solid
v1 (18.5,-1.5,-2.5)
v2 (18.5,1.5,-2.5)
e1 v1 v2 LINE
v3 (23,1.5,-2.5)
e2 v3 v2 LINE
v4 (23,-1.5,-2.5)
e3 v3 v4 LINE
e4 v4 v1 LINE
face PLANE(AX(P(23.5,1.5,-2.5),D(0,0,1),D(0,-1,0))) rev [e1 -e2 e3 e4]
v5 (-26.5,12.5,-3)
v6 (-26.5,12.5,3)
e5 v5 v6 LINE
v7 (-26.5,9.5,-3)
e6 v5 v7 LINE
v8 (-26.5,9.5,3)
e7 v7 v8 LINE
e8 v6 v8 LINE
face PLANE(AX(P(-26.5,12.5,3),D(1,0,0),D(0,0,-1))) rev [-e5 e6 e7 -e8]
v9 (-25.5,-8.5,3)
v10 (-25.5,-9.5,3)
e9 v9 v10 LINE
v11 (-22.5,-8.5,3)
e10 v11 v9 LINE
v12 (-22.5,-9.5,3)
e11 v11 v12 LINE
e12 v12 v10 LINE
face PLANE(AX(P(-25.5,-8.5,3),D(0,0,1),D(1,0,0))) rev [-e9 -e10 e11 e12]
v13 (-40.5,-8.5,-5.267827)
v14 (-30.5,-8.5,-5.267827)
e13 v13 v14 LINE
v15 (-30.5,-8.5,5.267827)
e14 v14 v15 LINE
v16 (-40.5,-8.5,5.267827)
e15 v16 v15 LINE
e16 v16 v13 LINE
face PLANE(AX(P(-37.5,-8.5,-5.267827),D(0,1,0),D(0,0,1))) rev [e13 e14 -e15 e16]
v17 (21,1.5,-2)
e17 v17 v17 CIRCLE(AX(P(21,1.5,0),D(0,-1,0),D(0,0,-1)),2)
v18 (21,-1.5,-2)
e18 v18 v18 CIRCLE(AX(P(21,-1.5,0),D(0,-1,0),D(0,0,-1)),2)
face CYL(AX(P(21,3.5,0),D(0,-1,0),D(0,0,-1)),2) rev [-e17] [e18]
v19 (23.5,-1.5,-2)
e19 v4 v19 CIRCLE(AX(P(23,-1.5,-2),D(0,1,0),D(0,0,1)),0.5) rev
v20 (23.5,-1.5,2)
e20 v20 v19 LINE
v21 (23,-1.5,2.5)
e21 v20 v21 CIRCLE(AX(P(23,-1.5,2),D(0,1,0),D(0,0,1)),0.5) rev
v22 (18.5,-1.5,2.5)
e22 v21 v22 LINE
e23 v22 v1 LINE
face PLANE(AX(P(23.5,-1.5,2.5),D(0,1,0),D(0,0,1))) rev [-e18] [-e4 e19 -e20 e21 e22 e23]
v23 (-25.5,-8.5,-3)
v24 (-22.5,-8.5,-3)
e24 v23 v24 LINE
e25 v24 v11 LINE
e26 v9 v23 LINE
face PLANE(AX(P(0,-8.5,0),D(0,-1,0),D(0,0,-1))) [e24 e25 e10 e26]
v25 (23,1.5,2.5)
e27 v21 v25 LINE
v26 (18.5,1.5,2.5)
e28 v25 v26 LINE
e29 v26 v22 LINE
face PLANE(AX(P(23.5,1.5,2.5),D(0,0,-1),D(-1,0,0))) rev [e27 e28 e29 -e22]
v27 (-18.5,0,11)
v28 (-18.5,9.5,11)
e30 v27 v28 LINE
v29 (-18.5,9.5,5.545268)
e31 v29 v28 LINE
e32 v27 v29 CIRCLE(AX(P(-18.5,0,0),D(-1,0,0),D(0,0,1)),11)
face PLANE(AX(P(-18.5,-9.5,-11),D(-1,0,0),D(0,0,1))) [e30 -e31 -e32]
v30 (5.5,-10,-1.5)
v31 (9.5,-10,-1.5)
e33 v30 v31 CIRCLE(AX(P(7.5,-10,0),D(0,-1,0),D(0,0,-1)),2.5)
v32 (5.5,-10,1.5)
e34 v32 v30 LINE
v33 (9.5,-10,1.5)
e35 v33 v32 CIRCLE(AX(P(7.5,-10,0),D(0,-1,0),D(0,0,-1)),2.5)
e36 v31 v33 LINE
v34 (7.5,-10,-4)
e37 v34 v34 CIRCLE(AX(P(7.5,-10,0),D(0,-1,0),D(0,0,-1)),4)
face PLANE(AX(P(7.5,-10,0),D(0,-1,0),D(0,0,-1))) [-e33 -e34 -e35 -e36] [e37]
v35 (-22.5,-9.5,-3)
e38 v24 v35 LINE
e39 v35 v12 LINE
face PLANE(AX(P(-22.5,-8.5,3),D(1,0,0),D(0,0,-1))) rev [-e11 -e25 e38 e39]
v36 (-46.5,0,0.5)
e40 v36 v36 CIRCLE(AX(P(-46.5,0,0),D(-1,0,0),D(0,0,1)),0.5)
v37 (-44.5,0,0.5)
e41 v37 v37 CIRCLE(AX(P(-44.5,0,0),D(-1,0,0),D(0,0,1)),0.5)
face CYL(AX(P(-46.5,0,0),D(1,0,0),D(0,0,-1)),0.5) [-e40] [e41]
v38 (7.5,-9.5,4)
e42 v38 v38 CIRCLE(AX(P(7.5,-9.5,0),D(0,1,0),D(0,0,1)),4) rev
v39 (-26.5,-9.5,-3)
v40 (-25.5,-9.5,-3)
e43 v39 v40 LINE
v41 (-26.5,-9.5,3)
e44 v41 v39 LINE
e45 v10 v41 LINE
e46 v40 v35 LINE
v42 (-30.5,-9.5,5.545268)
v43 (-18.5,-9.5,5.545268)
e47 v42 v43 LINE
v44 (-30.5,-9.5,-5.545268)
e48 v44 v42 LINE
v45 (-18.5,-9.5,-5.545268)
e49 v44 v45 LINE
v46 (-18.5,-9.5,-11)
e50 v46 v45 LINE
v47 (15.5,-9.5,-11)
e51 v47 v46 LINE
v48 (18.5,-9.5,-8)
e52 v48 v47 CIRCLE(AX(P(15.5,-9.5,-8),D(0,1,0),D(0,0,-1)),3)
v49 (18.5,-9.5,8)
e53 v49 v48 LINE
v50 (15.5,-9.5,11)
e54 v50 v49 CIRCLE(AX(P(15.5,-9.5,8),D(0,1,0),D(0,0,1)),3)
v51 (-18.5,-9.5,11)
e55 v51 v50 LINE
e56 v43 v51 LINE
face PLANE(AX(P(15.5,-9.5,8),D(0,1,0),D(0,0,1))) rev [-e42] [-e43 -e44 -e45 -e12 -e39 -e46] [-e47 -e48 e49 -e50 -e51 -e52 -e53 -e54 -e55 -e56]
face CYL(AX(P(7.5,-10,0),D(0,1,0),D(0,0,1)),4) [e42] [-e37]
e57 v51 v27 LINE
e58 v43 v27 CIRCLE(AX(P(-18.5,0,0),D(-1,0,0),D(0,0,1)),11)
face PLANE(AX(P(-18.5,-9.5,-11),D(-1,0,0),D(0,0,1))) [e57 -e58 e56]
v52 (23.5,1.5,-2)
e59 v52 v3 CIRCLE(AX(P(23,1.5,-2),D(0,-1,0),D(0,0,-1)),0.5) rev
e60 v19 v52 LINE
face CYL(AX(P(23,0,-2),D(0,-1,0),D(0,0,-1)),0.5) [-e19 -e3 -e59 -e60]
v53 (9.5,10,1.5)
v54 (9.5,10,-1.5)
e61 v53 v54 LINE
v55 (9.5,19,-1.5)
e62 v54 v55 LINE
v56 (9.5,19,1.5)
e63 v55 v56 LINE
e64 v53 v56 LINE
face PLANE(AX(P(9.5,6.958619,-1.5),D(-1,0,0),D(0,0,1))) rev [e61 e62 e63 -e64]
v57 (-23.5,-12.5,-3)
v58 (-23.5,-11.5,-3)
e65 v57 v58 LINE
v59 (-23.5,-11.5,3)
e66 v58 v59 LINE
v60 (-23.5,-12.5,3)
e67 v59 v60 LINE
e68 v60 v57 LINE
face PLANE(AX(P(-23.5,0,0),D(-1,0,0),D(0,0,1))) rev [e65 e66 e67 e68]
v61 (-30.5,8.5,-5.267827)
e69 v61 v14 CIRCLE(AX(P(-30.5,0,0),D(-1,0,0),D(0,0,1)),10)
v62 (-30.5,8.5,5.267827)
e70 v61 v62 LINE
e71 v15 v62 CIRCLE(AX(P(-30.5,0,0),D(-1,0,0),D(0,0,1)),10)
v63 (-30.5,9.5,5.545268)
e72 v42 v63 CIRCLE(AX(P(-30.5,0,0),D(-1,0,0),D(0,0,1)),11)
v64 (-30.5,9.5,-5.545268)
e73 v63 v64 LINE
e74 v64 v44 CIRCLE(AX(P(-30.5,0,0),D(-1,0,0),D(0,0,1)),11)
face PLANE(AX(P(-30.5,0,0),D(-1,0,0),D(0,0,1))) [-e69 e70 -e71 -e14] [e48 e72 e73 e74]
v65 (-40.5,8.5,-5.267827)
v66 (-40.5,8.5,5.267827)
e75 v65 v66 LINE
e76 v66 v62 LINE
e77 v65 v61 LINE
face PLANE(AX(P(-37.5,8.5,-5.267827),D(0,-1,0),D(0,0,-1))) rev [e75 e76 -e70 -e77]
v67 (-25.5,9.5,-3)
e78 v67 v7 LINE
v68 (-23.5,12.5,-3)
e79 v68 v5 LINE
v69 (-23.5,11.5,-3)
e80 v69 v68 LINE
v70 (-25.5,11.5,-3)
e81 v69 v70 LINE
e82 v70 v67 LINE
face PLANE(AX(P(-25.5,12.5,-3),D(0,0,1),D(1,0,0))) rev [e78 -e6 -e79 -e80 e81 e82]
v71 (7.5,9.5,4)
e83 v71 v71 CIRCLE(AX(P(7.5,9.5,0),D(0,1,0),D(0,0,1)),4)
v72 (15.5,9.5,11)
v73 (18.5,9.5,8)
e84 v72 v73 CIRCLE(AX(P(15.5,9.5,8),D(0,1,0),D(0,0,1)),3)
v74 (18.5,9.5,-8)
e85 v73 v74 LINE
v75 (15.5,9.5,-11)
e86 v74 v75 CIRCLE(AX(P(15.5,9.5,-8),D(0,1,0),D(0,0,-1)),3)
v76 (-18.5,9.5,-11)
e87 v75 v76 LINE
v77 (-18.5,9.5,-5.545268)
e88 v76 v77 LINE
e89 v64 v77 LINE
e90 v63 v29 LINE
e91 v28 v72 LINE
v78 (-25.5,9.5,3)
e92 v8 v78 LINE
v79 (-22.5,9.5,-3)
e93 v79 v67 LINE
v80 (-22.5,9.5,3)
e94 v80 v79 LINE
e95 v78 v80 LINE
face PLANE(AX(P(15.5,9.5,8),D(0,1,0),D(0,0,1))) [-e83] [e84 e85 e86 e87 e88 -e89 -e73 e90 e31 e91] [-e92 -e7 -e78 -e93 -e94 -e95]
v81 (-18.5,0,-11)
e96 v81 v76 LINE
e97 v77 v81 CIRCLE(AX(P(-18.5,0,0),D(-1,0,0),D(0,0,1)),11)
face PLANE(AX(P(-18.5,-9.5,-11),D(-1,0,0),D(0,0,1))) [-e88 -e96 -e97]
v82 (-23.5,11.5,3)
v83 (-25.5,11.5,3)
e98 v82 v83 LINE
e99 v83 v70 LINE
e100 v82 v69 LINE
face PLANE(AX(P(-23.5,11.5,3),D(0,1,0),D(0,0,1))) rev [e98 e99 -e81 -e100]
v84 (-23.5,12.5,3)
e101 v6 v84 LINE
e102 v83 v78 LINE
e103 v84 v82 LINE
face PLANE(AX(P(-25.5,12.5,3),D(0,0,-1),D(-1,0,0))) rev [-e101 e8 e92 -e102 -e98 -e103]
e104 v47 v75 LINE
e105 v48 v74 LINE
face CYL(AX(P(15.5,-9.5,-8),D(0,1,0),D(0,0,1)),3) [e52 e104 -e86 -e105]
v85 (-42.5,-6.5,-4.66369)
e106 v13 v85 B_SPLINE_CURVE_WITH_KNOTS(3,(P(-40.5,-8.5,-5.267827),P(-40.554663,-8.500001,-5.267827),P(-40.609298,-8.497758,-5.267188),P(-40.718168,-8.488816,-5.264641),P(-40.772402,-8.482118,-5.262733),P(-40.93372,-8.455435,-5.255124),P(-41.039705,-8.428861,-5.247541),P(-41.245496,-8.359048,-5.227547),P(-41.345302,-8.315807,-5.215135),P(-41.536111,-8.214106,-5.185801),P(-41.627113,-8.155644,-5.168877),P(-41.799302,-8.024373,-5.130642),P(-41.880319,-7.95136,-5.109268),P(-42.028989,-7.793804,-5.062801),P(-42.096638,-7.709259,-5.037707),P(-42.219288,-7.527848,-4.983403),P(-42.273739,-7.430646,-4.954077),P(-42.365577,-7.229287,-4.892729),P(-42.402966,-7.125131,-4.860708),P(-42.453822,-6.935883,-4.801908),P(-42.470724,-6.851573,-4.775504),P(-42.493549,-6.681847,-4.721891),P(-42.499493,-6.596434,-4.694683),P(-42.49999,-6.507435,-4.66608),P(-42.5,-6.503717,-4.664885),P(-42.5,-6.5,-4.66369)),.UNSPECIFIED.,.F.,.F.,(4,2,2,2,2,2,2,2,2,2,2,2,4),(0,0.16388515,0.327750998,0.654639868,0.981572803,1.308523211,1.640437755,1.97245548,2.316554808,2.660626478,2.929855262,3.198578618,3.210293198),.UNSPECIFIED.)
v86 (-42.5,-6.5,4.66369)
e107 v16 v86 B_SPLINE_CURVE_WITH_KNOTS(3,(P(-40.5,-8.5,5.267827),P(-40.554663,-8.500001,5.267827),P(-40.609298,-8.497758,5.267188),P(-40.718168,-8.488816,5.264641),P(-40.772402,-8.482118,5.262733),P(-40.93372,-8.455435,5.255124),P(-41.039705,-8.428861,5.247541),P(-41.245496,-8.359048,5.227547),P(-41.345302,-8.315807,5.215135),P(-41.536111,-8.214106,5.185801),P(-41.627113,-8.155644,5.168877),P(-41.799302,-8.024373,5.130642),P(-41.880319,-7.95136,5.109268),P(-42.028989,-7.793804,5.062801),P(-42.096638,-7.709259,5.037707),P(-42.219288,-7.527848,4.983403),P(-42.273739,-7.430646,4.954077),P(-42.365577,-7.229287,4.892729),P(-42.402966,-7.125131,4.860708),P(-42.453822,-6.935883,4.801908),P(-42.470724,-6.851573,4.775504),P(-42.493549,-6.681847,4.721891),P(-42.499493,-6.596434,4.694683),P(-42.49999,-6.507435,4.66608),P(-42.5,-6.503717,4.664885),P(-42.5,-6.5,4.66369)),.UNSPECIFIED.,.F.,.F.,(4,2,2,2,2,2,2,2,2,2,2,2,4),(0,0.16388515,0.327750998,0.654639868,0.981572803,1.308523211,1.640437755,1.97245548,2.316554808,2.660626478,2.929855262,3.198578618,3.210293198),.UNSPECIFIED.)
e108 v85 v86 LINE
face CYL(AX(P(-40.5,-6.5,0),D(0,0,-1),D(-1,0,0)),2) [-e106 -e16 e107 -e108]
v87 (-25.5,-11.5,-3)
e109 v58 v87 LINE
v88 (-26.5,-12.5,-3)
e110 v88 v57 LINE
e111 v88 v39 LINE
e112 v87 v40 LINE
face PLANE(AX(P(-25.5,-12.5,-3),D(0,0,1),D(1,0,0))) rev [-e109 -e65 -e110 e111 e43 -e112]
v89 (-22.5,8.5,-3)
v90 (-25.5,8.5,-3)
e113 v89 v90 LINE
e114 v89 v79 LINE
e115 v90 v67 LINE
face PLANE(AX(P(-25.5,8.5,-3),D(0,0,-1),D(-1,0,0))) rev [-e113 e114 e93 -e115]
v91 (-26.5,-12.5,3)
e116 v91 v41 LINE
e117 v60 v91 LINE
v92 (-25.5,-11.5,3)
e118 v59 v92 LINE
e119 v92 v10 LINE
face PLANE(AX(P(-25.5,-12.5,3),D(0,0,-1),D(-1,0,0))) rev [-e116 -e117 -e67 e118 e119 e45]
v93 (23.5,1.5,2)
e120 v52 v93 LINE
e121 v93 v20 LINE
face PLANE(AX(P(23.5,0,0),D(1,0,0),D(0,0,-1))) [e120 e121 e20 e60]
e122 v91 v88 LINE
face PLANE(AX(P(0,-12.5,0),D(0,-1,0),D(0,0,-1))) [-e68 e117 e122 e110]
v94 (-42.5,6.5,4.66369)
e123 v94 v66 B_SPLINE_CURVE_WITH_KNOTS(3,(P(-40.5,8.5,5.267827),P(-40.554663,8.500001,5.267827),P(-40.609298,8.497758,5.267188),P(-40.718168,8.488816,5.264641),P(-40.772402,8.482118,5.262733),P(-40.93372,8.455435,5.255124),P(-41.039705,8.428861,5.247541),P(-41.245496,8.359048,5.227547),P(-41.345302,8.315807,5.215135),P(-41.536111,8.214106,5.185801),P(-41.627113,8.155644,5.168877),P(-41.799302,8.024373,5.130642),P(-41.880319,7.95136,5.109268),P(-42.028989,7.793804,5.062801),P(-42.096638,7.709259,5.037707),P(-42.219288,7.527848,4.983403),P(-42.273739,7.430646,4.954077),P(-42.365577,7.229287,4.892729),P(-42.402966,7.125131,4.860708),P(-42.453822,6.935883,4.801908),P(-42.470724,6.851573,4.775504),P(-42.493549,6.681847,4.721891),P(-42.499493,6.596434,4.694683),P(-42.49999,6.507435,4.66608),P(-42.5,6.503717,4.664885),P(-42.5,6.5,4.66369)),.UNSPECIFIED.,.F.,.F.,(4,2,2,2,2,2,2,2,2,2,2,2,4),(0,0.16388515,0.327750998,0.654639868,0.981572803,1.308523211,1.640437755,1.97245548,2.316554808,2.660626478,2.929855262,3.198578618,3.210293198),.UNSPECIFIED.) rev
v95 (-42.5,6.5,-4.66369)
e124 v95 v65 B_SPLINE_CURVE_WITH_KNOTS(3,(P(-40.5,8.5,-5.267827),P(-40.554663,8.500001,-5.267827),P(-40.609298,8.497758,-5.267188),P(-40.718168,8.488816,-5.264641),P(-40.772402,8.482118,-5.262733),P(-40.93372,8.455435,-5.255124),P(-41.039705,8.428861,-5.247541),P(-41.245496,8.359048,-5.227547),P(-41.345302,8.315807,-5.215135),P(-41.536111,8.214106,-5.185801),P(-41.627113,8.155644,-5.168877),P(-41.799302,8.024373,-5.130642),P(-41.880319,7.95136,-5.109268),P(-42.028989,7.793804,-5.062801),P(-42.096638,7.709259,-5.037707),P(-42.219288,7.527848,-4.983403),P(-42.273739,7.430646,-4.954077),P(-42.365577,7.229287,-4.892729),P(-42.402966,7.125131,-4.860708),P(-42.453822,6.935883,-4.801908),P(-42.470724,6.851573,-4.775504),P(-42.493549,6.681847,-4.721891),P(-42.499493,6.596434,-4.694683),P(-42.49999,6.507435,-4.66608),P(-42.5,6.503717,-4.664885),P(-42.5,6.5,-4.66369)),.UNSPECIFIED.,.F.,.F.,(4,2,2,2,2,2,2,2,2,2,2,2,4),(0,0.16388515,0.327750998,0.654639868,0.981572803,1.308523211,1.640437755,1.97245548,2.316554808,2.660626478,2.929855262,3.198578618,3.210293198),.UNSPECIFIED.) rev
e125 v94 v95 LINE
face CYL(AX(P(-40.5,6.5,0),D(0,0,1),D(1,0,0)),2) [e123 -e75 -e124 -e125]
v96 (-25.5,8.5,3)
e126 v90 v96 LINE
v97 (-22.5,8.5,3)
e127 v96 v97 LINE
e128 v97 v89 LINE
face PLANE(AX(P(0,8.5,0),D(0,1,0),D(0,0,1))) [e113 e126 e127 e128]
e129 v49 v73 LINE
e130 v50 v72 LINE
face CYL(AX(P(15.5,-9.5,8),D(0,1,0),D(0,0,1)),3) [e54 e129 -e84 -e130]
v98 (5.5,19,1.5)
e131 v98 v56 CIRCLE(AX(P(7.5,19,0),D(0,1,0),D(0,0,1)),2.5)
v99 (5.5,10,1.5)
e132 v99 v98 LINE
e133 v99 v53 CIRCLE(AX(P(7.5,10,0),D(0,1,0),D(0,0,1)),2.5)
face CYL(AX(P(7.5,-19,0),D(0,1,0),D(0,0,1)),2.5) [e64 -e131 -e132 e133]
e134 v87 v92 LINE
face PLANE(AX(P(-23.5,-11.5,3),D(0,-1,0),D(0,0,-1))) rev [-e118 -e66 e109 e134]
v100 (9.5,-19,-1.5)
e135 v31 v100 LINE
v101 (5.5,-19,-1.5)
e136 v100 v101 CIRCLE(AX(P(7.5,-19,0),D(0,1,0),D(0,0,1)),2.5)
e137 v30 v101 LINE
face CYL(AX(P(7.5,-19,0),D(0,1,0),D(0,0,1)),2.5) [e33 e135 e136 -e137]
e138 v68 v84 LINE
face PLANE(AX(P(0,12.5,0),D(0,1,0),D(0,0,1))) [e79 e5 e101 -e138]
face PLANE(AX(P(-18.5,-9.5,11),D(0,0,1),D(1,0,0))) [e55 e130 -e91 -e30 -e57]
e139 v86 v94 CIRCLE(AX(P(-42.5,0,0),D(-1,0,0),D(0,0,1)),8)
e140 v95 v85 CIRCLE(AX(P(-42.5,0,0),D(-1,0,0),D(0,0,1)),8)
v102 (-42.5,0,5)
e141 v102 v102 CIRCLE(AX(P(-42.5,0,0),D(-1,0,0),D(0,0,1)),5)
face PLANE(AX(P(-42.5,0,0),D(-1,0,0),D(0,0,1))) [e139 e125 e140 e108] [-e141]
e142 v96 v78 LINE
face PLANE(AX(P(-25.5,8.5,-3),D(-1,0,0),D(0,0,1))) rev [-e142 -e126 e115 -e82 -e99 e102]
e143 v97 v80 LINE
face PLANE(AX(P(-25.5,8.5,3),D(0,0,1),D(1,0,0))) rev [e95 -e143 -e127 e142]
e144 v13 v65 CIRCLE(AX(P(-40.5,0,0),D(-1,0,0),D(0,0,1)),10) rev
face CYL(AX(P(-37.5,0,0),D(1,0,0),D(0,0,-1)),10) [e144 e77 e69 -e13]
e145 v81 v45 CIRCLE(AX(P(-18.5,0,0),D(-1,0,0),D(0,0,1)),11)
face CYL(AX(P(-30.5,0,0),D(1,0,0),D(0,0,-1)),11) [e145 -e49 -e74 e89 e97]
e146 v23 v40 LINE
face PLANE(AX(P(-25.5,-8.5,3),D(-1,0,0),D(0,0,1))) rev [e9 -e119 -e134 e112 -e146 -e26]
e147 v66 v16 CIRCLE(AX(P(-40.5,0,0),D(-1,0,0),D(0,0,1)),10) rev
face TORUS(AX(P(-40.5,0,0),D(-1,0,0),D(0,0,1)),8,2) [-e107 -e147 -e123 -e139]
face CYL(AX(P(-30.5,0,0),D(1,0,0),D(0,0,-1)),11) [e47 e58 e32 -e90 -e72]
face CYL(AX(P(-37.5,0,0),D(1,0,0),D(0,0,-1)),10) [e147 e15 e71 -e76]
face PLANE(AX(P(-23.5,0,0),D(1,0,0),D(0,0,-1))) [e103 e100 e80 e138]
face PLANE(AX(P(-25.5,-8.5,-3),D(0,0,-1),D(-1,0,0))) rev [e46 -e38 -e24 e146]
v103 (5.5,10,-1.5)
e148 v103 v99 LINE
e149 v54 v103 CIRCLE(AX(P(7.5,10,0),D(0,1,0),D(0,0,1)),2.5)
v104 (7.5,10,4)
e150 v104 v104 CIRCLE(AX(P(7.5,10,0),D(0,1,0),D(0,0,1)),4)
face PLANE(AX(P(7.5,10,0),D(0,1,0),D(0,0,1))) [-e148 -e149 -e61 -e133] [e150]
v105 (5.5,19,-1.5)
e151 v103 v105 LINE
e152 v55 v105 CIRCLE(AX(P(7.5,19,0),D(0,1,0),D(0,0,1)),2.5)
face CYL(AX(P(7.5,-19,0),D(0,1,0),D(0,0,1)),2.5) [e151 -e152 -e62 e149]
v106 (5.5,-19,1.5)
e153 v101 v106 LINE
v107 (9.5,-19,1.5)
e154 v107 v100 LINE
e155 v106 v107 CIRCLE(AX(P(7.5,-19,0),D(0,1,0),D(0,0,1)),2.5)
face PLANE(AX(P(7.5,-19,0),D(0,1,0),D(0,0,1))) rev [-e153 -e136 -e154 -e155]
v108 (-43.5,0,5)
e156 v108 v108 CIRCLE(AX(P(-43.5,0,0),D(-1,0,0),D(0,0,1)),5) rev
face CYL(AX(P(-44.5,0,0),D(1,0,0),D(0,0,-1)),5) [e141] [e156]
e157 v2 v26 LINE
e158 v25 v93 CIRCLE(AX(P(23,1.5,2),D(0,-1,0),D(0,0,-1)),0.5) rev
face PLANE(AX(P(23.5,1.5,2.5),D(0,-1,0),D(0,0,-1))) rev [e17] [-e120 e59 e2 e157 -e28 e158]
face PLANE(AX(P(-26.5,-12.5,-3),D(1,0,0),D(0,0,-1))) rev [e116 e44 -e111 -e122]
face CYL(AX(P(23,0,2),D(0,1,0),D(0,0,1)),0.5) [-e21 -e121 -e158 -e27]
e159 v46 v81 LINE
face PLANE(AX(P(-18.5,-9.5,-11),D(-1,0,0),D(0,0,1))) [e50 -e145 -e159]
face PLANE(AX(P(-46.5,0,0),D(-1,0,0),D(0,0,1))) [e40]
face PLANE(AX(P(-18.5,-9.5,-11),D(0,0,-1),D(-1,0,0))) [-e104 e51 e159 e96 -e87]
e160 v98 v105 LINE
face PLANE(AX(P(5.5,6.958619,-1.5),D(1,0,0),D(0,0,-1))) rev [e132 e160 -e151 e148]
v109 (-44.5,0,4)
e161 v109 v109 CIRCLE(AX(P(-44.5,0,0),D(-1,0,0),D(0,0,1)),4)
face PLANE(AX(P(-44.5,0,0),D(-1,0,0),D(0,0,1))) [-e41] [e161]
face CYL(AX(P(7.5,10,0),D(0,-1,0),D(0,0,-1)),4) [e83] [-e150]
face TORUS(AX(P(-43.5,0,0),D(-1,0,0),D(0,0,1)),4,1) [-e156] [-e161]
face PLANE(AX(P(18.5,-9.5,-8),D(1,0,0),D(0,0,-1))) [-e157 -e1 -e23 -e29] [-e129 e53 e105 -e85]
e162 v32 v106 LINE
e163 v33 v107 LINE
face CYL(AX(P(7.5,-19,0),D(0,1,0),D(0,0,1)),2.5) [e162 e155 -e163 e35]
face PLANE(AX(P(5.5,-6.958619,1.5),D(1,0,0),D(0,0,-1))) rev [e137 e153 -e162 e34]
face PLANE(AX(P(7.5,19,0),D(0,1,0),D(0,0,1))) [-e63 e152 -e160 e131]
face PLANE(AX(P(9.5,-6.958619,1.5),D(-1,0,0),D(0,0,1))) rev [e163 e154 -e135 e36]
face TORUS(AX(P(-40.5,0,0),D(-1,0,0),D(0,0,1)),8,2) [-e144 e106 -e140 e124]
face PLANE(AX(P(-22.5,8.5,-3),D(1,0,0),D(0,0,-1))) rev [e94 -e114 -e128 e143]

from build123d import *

# Parameters (mm, degrees)
Y_KSEKLIK_EKSTR_ZYON1_DEPTH      = 9.5
Y_KSEKLIK_EKSTR_ZYON1_DEPTH_BACK = 9.5
IZIM7_R                          = 2.5
KES_EKSTR_ZYON2_DEPTH            = 19
Y_KSEKLIK_EKSTR_ZYON7_START      = 0.5
IZIM8_R                          = 4
IZIM8_R_2                        = 2.5
Y_KSEKLIK_EKSTR_ZYON7_DEPTH      = 0.5
IZIM9_R                          = 4
IZIM9_R_2                        = 2.5
Y_KSEKLIK_EKSTR_ZYON8_DEPTH      = 0.5
Y_KSEKLIK_EKSTR_ZYON9_DEPTH      = 19
Y_KSEKLIK_EKSTR_ZYON9_DEPTH_BACK = 19
IZIM10_R                         = 2.5
KES_EKSTR_ZYON4_DEPTH            = 9
KES_EKSTR_ZYON5_DEPTH            = 9
IZIM13_W                         = 5
IZIM13_H                         = 3
Y_KSEKLIK_EKSTR_ZYON10_DEPTH     = 5
IZIM14_R                         = 2
KES_EKSTR_ZYON6_DEPTH            = 5
RADYUS3_R                        = 0.5
Y_KSEKLIK_EKSTR_ZYON11_DEPTH     = 12
Y_KSEKLIK_EKSTR_ZYON12_DEPTH     = 19
Y_KSEKLIK_EKSTR_ZYON13_DEPTH     = 5
RADYUS4_R                        = 2
IZIM18_R                         = 5
Y_KSEKLIK_EKSTR_ZYON14_DEPTH     = 2
RADYUS5_R                        = 1
IZIM19_R                         = 0.5
Y_KSEKLIK_EKSTR_ZYON15_DEPTH     = 2
IZIM20_W                         = 3
IZIM20_H                         = 6
KES_EKSTR_ZYON7_DEPTH            = 1
IZIM21_W                         = 3
IZIM21_H                         = 6
KES_EKSTR_ZYON8_DEPTH            = 1
IZIM22_W                         = 1
IZIM22_H                         = 6
Y_KSEKLIK_EKSTR_ZYON17_DEPTH     = 3
IZIM23_W                         = 6
IZIM23_H                         = 1
Y_KSEKLIK_EKSTR_ZYON18_DEPTH     = 2
IZIM24_W                         = 1
IZIM24_H                         = 6
Y_KSEKLIK_EKSTR_ZYON19_DEPTH     = 3
IZIM25_W                         = 6
IZIM25_H                         = 1
Y_KSEKLIK_EKSTR_ZYON20_DEPTH     = 2


with BuildPart() as part:
    # Çizim1 → Yükseklik-Ekstrüzyon1 (new, two sides: drawn at the far end of the back side and taken through both)
    with BuildSketch(Plane(origin=(0, 0, 0), x_dir=(1, 0, 0), z_dir=(0, 1, 0)).offset(-Y_KSEKLIK_EKSTR_ZYON1_DEPTH_BACK)):
        with BuildLine():
            Line((-18.5, 11), (15.5, 11))
            ThreePointArc((15.5, 11), (17.621320344, 10.121320344), (18.5, 8))
            Line((18.5, 8), (18.5, -8))
            ThreePointArc((18.5, -8), (17.621320344, -10.121320344), (15.5, -11))
            Line((15.5, -11), (-18.5, -11))
            Line((-18.5, -11), (-18.5, 11))
        make_face()
    extrude(amount=Y_KSEKLIK_EKSTR_ZYON1_DEPTH + Y_KSEKLIK_EKSTR_ZYON1_DEPTH_BACK)

    # Çizim7 → Kes-Ekstrüzyon2 (cut)
    with BuildSketch(Plane(origin=(0, 9.5, 0), x_dir=(1, 0, 0), z_dir=(0, 1, 0))):
        with Locations(Location((7.5, 0, 0), (0, 0, 270))):
            Circle(IZIM7_R)
    extrude(amount=-KES_EKSTR_ZYON2_DEPTH, mode=Mode.SUBTRACT)

    # Çizim8 → Yükseklik-Ekstrüzyon7 (add)
    with BuildSketch(Plane(origin=(0, 9.5, 0), x_dir=(1, 0, 0), z_dir=(0, 1, 0)).offset(Y_KSEKLIK_EKSTR_ZYON7_START)):
        with Locations(Location((7.5, 0, 0), (0, 0, 270))):
            Circle(IZIM8_R)
        with Locations(Location((7.5, 0, 0), (0, 0, 270))):
            Circle(IZIM8_R_2, mode=Mode.SUBTRACT)
    extrude(amount=-Y_KSEKLIK_EKSTR_ZYON7_DEPTH)

    # Çizim9 → Yükseklik-Ekstrüzyon8 (add)
    with BuildSketch(Plane.XZ.offset(9.5)):
        with Locations(Location((7.5, 0, 0), (0, 0, 90))):
            Circle(IZIM9_R)
        with Locations(Location((7.5, 0, 0), (0, 0, 90))):
            Circle(IZIM9_R_2, mode=Mode.SUBTRACT)
    extrude(amount=Y_KSEKLIK_EKSTR_ZYON8_DEPTH)

    # Çizim10 → Yükseklik-Ekstrüzyon9 (add, two sides: drawn at the far end of the back side and taken through both)
    with BuildSketch(Plane(origin=(0, 0, 0), x_dir=(1, 0, 0), z_dir=(0, 1, 0)).offset(-Y_KSEKLIK_EKSTR_ZYON9_DEPTH_BACK)):
        with Locations(Location((7.5, 0, 0), (0, 0, 270))):
            Circle(IZIM10_R)
    extrude(amount=Y_KSEKLIK_EKSTR_ZYON9_DEPTH + Y_KSEKLIK_EKSTR_ZYON9_DEPTH_BACK)

    # Çizim11 → Kes-Ekstrüzyon4 (cut)
    with BuildSketch(Plane(origin=(0, 19, 0), x_dir=(1, 0, 0), z_dir=(0, 1, 0))):
        with BuildLine():
            Line((5.5, 1.5), (5.5, -1.5))
            ThreePointArc((5.5, -1.5), (5, 0), (5.5, 1.5))
        make_face()
        with BuildLine():
            Line((9.5, 1.5), (9.5, -1.5))
            ThreePointArc((9.5, -1.5), (10, 0), (9.5, 1.5))
        make_face()
    extrude(amount=-KES_EKSTR_ZYON4_DEPTH, mode=Mode.SUBTRACT)

    # Çizim12 → Kes-Ekstrüzyon5 (cut)
    with BuildSketch(Plane.XZ.offset(19)):
        with BuildLine():
            Line((5.5, 1.5), (5.5, -1.5))
            ThreePointArc((5.5, -1.5), (5, 0), (5.5, 1.5))
        make_face()
        with BuildLine():
            Line((9.5, 1.5), (9.5, -1.5))
            ThreePointArc((9.5, -1.5), (10, 0), (9.5, 1.5))
        make_face()
    extrude(amount=-KES_EKSTR_ZYON5_DEPTH, mode=Mode.SUBTRACT)

    # Çizim13 → Yükseklik-Ekstrüzyon10 (add)
    with BuildSketch(Plane(origin=(18.5, 0, 0), x_dir=(0, 0, -1), z_dir=(1, 0, 0))):
        Rectangle(IZIM13_W, IZIM13_H)
    extrude(amount=Y_KSEKLIK_EKSTR_ZYON10_DEPTH)

    # Çizim14 → Kes-Ekstrüzyon6 (cut)
    with BuildSketch(Plane.XZ.offset(1.5)):
        with Locations(Location((21, 0, 0), (0, 0, 270))):
            Circle(IZIM14_R)
    extrude(amount=-KES_EKSTR_ZYON6_DEPTH, mode=Mode.SUBTRACT)

    # Radyus3
    radyus3_edges = [part.edges().sort_by_distance(p)[0] for p in [
        (23.5, 0, -2.5),
        (23.5, 0, 2.5),
    ]]
    fillet(radyus3_edges, radius=RADYUS3_R)

    # Çizim15 → Yükseklik-Ekstrüzyon11 (add)
    with BuildSketch(Plane.ZY.offset(18.5)):
        with BuildLine():
            Line((5.545268253, 9.5), (-5.545268253, 9.5))
            ThreePointArc((-5.545268253, 9.5), (-11, 0), (-5.545268253, -9.5))
            Line((-5.545268253, -9.5), (5.545268253, -9.5))
            ThreePointArc((5.545268253, -9.5), (10.965120348, -0.875291809), (6.982120022, 8.5))
            ThreePointArc((6.982120022, 8.5), (6.283618722, 9.028628675), (5.545268253, 9.5))
        make_face()
        with BuildLine():
            ThreePointArc((-5.267826876, -8.5), (-10, 0), (-5.267826876, 8.5))
            Line((-5.267826876, 8.5), (5.267826876, 8.5))
            ThreePointArc((5.267826876, 8.5), (10, 0), (5.267826876, -8.5))
            Line((5.267826876, -8.5), (-5.267826876, -8.5))
        make_face(mode=Mode.SUBTRACT)
    extrude(amount=Y_KSEKLIK_EKSTR_ZYON11_DEPTH)

    # Çizim16 → Yükseklik-Ekstrüzyon12 (add)
    with BuildSketch(Plane.ZY.offset(18.5)):
        with BuildLine():
            Line((-5.267826876, 8.5), (5.267826876, 8.5))
            ThreePointArc((5.267826876, 8.5), (10, 0), (5.267826876, -8.5))
            Line((5.267826876, -8.5), (-5.267826876, -8.5))
            ThreePointArc((-5.267826876, -8.5), (-10, 0), (-5.267826876, 8.5))
        make_face()
    extrude(amount=Y_KSEKLIK_EKSTR_ZYON12_DEPTH)

    # Çizim17 → Yükseklik-Ekstrüzyon13 (add)
    with BuildSketch(Plane.ZY.offset(37.5)):
        with BuildLine():
            Line((-5.267826876, 8.5), (5.267826876, 8.5))
            ThreePointArc((5.267826876, 8.5), (10, 0), (5.267826876, -8.5))
            Line((5.267826876, -8.5), (-5.267826876, -8.5))
            ThreePointArc((-5.267826876, -8.5), (-10, 0), (-5.267826876, 8.5))
        make_face()
    extrude(amount=Y_KSEKLIK_EKSTR_ZYON13_DEPTH)

    # Radyus4
    # the kernel refuses this fillet: 2 mm, written as the material it takes off along each edge
    with BuildSketch(Plane(origin=(-42.5, 0, 0), x_dir=(0, -0.9985166114955222, -0.05444792528187306), z_dir=(0, -0.05444792528187306, 0.9985166114955222))) as radyus4_piece_1:
        with BuildLine():
            CenterArc((10 - RADYUS4_R, RADYUS4_R), RADYUS4_R, 270, 90)
            Line((10, RADYUS4_R), (10, 0))
            Line((10, 0), (10 - RADYUS4_R, 0))
        make_face()
    revolve(axis=Axis((-42.5, 0, 0), (1, 0, 0)), revolution_arc=173.757640436, mode=Mode.SUBTRACT)
    with BuildSketch(Plane(origin=(-42.5, -8.5, 10.267826876), x_dir=(1, 0, 0), z_dir=(0, 0, -1))) as radyus4_piece_2:
        with BuildLine():
            CenterArc((RADYUS4_R, -RADYUS4_R), RADYUS4_R, 90, 90)
            Line((0, -RADYUS4_R), (0, 0))
            Line((0, 0), (RADYUS4_R, 0))
        make_face()
    extrude(amount=20.535653753, mode=Mode.SUBTRACT)
    with BuildSketch(Plane(origin=(-42.5, 0, 0), x_dir=(0, 0.9985166114955222, 0.05444792528187289), z_dir=(0, 0.05444792528187289, -0.9985166114955222))) as radyus4_piece_3:
        with BuildLine():
            CenterArc((10 - RADYUS4_R, RADYUS4_R), RADYUS4_R, 270, 90)
            Line((10, RADYUS4_R), (10, 0))
            Line((10, 0), (10 - RADYUS4_R, 0))
        make_face()
    revolve(axis=Axis((-42.5, 0, 0), (1, 0, 0)), revolution_arc=173.757640436, mode=Mode.SUBTRACT)
    with BuildSketch(Plane(origin=(-42.5, 8.5, -10.267826876), x_dir=(0, -1, 0), z_dir=(0, 0, 1))) as radyus4_piece_4:
        with BuildLine():
            CenterArc((RADYUS4_R, RADYUS4_R), RADYUS4_R, 180, 90)
            Line((0, RADYUS4_R), (0, 0))
            Line((0, 0), (RADYUS4_R, 0))
        make_face()
    extrude(amount=20.535653753, mode=Mode.SUBTRACT)

    # Çizim18 → Yükseklik-Ekstrüzyon14 (add)
    with BuildSketch(Plane.ZY.offset(42.5)):
        Circle(IZIM18_R)
    extrude(amount=Y_KSEKLIK_EKSTR_ZYON14_DEPTH)

    # Radyus5
    radyus5_edges = [part.edges().sort_by_distance(p)[0] for p in [
        (-44.5, 0, -5),
    ]]
    fillet(radyus5_edges, radius=RADYUS5_R)

    # Çizim19 → Yükseklik-Ekstrüzyon15 (add)
    with BuildSketch(Plane.ZY.offset(44.5)):
        Circle(IZIM19_R)
    extrude(amount=Y_KSEKLIK_EKSTR_ZYON15_DEPTH)

    # Çizim20 → Kes-Ekstrüzyon7 (cut)
    with BuildSketch(Plane(origin=(0, 9.5, 0), x_dir=(1, 0, 0), z_dir=(0, 1, 0))):
        with Locations((-24, 0)):
            Rectangle(IZIM20_W, IZIM20_H)
    extrude(amount=-KES_EKSTR_ZYON7_DEPTH, mode=Mode.SUBTRACT)

    # Çizim21 → Kes-Ekstrüzyon8 (cut)
    with BuildSketch(Plane.XZ.offset(9.5)):
        with Locations((-24, 0)):
            Rectangle(IZIM21_W, IZIM21_H)
    extrude(amount=-KES_EKSTR_ZYON8_DEPTH, mode=Mode.SUBTRACT)

    # Çizim22 → Yükseklik-Ekstrüzyon17 (add)
    with BuildSketch(Plane.XZ.offset(9.5)):
        with Locations((-26, 0)):
            Rectangle(IZIM22_W, IZIM22_H)
    extrude(amount=Y_KSEKLIK_EKSTR_ZYON17_DEPTH)

    # Çizim23 → Yükseklik-Ekstrüzyon18 (add)
    with BuildSketch(Plane(origin=(-25.5, 0, 0), x_dir=(0, 0, -1), z_dir=(1, 0, 0))):
        with Locations((0, -12)):
            Rectangle(IZIM23_W, IZIM23_H)
    extrude(amount=Y_KSEKLIK_EKSTR_ZYON18_DEPTH)

    # Çizim24 → Yükseklik-Ekstrüzyon19 (add)
    with BuildSketch(Plane(origin=(0, 9.5, 0), x_dir=(1, 0, 0), z_dir=(0, 1, 0))):
        with Locations((-26, 0)):
            Rectangle(IZIM24_W, IZIM24_H)
    extrude(amount=Y_KSEKLIK_EKSTR_ZYON19_DEPTH)

    # Çizim25 → Yükseklik-Ekstrüzyon20 (add)
    with BuildSketch(Plane(origin=(-25.5, 0, 0), x_dir=(0, 0, -1), z_dir=(1, 0, 0))):
        with Locations((0, 12)):
            Rectangle(IZIM25_W, IZIM25_H)
    extrude(amount=Y_KSEKLIK_EKSTR_ZYON20_DEPTH)


solid = part.part
